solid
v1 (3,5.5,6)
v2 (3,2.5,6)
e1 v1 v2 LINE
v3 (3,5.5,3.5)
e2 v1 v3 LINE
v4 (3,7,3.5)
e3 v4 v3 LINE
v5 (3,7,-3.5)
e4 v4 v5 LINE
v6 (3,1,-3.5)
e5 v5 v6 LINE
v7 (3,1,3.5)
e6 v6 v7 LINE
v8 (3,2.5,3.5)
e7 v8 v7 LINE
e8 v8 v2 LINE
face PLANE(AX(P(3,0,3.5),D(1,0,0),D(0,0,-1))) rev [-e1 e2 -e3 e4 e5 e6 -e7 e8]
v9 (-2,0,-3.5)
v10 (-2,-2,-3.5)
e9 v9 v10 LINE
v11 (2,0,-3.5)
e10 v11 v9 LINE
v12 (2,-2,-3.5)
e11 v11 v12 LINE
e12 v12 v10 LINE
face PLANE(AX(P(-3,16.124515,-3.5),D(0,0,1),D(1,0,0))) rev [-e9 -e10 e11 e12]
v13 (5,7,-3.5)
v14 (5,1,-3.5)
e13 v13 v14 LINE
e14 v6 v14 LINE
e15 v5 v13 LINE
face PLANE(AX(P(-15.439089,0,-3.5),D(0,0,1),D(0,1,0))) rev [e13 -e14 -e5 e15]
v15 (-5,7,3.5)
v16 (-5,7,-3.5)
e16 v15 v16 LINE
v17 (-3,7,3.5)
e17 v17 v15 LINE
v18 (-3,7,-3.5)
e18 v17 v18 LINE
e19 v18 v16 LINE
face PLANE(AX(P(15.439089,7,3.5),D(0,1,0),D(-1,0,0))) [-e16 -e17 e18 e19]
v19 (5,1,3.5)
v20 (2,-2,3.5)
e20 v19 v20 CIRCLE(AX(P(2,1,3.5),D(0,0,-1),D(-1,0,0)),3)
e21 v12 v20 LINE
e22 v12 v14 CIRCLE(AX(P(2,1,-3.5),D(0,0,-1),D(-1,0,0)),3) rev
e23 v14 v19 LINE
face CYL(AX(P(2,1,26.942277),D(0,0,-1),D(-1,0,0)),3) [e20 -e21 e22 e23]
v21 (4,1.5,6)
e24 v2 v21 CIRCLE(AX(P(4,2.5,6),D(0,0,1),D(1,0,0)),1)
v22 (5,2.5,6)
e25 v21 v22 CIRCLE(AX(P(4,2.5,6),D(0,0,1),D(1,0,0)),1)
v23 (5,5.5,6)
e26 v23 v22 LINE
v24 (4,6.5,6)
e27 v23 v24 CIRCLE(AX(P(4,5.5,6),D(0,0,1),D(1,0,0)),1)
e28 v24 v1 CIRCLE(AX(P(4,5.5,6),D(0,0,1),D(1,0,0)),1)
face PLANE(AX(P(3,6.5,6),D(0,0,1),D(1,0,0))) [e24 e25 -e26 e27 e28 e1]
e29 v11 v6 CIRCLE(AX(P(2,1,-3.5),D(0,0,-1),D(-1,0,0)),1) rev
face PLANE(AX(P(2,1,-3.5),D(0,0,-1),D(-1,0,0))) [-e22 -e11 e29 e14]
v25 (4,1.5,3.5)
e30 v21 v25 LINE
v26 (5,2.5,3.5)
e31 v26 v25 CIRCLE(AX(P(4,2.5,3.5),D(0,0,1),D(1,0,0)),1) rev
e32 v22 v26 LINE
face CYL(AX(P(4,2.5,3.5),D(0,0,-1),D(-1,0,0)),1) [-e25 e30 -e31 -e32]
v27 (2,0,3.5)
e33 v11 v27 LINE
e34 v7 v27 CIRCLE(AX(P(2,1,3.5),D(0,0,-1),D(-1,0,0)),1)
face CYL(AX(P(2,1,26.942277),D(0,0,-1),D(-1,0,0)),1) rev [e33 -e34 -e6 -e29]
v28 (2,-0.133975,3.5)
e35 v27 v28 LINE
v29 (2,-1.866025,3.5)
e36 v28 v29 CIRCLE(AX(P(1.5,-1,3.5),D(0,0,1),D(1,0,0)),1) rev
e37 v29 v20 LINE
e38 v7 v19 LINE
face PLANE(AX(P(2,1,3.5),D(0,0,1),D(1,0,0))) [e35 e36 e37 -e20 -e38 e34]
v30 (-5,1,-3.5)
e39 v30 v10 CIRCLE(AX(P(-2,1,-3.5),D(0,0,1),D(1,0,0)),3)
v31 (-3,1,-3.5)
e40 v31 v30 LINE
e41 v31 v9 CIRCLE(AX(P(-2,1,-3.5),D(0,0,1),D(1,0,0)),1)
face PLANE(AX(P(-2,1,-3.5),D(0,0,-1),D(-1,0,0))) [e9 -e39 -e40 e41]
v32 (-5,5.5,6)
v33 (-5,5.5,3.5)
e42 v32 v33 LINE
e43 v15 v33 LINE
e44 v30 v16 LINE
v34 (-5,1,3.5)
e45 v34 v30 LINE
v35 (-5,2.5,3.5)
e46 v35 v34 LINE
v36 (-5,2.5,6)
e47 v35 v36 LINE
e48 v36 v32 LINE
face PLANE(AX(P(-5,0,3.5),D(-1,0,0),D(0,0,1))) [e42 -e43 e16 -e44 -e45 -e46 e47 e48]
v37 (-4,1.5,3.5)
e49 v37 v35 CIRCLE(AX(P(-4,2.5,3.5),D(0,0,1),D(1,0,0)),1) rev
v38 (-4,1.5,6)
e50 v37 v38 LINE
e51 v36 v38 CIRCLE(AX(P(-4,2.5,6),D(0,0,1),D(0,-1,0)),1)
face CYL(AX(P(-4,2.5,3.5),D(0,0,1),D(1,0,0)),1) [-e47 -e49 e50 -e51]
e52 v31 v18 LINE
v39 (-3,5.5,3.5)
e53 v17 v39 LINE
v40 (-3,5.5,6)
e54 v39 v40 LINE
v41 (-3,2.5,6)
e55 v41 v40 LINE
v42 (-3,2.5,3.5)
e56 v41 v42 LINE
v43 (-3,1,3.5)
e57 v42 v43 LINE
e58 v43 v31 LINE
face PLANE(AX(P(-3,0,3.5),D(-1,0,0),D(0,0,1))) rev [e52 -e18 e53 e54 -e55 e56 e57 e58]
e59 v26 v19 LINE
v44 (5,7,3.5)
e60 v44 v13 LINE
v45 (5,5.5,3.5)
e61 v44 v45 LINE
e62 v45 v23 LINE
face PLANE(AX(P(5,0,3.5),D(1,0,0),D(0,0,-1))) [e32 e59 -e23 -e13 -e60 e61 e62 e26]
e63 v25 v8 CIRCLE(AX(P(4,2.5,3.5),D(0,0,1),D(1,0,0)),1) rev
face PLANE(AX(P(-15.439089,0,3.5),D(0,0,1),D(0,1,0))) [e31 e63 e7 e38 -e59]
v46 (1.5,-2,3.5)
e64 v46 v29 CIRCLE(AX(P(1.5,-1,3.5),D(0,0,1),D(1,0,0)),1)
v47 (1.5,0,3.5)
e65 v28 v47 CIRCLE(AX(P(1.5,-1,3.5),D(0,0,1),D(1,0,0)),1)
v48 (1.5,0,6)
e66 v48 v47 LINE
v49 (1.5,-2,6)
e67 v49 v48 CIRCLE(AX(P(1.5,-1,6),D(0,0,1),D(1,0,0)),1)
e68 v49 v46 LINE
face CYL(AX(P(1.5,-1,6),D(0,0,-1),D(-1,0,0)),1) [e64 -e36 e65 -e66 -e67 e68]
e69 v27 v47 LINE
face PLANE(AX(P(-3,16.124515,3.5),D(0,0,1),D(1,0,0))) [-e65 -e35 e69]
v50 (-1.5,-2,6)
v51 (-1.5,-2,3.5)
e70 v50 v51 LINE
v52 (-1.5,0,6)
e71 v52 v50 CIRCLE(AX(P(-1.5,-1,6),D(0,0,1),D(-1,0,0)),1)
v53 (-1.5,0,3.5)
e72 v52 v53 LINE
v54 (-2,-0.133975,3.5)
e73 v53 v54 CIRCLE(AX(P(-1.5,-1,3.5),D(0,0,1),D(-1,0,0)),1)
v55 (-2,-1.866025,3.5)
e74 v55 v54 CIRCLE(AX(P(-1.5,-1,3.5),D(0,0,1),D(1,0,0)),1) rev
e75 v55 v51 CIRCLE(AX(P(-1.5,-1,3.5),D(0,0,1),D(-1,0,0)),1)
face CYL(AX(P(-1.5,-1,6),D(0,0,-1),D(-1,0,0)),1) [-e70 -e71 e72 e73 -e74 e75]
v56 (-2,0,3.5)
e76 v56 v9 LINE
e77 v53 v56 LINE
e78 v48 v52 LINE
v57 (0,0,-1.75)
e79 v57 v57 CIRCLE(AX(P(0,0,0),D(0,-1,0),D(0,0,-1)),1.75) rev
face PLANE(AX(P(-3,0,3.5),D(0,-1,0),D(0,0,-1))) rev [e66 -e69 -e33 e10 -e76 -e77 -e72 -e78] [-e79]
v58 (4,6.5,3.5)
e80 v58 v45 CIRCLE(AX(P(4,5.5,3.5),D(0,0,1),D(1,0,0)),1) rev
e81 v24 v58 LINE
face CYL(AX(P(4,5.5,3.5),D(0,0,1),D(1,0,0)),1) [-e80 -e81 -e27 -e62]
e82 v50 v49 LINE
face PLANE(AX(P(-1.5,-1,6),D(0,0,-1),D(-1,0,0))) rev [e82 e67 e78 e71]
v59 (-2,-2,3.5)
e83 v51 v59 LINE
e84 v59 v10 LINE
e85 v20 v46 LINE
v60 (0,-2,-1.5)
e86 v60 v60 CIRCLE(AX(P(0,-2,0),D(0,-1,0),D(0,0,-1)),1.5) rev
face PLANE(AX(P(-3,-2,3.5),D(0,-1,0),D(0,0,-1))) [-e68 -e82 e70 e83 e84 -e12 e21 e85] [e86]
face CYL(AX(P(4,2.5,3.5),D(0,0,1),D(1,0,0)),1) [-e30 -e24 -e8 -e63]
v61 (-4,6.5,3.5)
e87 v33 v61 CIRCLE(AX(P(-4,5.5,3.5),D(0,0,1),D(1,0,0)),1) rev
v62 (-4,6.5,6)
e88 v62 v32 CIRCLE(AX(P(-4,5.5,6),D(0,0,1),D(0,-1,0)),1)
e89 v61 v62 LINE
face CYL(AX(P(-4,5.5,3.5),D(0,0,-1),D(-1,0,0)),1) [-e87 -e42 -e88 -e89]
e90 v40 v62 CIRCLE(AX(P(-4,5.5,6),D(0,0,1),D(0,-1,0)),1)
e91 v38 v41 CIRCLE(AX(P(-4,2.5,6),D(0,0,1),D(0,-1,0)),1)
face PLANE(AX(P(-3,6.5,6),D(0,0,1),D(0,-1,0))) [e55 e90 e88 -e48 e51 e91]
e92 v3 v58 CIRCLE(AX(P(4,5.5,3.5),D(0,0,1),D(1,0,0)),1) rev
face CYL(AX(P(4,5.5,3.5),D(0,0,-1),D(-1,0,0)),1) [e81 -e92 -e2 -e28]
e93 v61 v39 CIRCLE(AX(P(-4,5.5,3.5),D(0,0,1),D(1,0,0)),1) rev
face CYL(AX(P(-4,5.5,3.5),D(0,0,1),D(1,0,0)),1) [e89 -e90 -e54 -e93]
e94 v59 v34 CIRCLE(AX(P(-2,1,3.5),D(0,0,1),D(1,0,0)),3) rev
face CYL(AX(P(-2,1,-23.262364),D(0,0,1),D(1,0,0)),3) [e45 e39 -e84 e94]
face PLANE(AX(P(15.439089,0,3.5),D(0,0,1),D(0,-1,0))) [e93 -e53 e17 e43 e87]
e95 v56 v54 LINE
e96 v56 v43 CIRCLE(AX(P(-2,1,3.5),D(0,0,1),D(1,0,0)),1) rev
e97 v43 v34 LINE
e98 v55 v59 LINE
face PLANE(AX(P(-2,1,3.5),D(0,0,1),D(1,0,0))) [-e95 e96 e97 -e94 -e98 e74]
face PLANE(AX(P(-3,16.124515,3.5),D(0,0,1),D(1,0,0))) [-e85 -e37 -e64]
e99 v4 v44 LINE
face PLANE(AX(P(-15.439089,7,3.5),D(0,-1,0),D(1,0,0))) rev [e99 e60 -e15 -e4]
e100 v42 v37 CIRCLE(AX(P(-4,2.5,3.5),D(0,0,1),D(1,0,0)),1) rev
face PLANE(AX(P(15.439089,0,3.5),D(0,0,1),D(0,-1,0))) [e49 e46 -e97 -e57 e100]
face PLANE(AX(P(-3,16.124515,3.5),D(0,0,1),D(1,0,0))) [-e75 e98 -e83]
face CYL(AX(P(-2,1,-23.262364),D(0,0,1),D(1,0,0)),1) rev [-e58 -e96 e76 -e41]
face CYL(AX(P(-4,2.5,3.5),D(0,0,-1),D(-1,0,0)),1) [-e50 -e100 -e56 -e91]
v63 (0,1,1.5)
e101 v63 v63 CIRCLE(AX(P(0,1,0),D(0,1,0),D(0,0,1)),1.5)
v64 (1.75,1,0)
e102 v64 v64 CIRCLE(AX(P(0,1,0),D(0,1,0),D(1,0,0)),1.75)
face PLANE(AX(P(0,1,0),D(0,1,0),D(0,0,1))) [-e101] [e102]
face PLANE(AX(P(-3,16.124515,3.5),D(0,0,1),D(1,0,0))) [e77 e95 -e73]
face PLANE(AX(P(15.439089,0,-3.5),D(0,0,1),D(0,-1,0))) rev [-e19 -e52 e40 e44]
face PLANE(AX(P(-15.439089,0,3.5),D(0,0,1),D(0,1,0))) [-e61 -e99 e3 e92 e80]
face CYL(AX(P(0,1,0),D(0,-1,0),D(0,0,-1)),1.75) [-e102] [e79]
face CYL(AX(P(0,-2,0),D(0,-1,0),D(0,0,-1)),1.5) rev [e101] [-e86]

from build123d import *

# Parameters (mm, degrees)
EXTRU_MINCE1_DEPTH      = 3.5
D_PLIAGE_START          = -3.5
D_PLIAGE_2_OUTLINE_W    = 2
D_PLIAGE_2_OUTLINE_H    = 7
D_PLIAGE_2_DEPTH        = 7
D_PLIAGE_2_2_OUTLINE_W  = 6.141592654
D_PLIAGE_2_2_OUTLINE_H  = 2
D_PLIAGE_2_2_DEPTH      = 7
PLIAGE_START            = -3.5
PLIAGE_2_DEPTH          = 7
PLIAGE_2_2_DEPTH        = 7
ENL_V_MAT_EXTRU_1_REACH = 11.287
ESQUISSE10_R            = 1.5
ESQUISSE11_W            = 2.5
ESQUISSE11_H            = 5
PATTE1_DEPTH            = 2
CONG_2_R                = 1
ESQUISSE13_W            = 2.5
ESQUISSE13_H            = 5
PATTE2_DEPTH            = 2
CONG_9_R                = 1
EXTRUSION2_DEPTH        = 2.5
EXTRU_MINCE2_START      = 1
ESQUISSE16_R            = 1.75
ESQUISSE16_R_2          = 1.5
EXTRU_MINCE2_DEPTH      = 1


# Read off the part's stored shape, not the designer's step: Dépliage 2, Pliage 2
# Sheet-metal steps are written as plain solids
with BuildPart() as part:
    # Esquisse1 → Extru.-Mince1 (new, symmetric)
    with BuildSketch(Plane.XY):
        Polygon((-3, 7), (-3, 0), (3, 0), (3, 7), (5, 7), (5, -2), (-5, -2), (-5, 7), align=None)
    extrude(amount=EXTRU_MINCE1_DEPTH, both=True)

    # Dépliage 2 outline → Dépliage 2 (cut)
    with BuildSketch(Plane.XY.offset(D_PLIAGE_START)):
        with Locations((4, 3.5)):
            Rectangle(D_PLIAGE_2_OUTLINE_W, D_PLIAGE_2_OUTLINE_H)
        with Locations((-4, 3.5)):
            Rectangle(D_PLIAGE_2_OUTLINE_W, D_PLIAGE_2_OUTLINE_H)
    extrude(amount=D_PLIAGE_2_DEPTH, mode=Mode.SUBTRACT)

    # D_pliage 2 2 outline → D_pliage 2 2 (add)
    with BuildSketch(Plane.XY.offset(D_PLIAGE_START)):
        with Locations((8.070796327, -1)):
            Rectangle(D_PLIAGE_2_2_OUTLINE_W, D_PLIAGE_2_2_OUTLINE_H)
        with Locations((-8.070796327, -1)):
            Rectangle(D_PLIAGE_2_2_OUTLINE_W, D_PLIAGE_2_2_OUTLINE_H)
    extrude(amount=D_PLIAGE_2_2_DEPTH)

    # Pliage 2 outline → Pliage 2 (cut)
    with BuildSketch(Plane.XY.offset(PLIAGE_START)):
        with BuildLine():
            ThreePointArc((-2, -2), (-3.732050808, -1.449489743), (-4.828427125, 0))
            Line((-4.828427125, 0), (-11.141592654, 0))
            Line((-11.141592654, 0), (-11.141592654, -2))
            Line((-11.141592654, -2), (-2, -2))
        make_face()
        with BuildLine():
            Line((11.141592654, 0), (4.828427125, 0))
            ThreePointArc((4.828427125, 0), (3.732050808, -1.449489743), (2, -2))
            Line((2, -2), (11.141592654, -2))
            Line((11.141592654, -2), (11.141592654, 0))
        make_face()
    extrude(amount=PLIAGE_2_DEPTH, mode=Mode.SUBTRACT)

    # Pliage 2 2 outline → Pliage 2 2 (add)
    with BuildSketch(Plane.XY.offset(PLIAGE_START)):
        with BuildLine():
            Line((-3, 1), (-3, 7))
            Line((-3, 7), (-5, 7))
            Line((-5, 7), (-5, 1))
            ThreePointArc((-5, 1), (-4.956795679, 0.492694064), (-4.828427125, 0))
            Line((-4.828427125, 0), (-2, 0))
            ThreePointArc((-2, 0), (-2.707106781, 0.292893219), (-3, 1))
        make_face()
        with BuildLine():
            Line((5, 7), (3, 7))
            Line((3, 7), (3, 1))
            ThreePointArc((3, 1), (2.707106781, 0.292893219), (2, 0))
            Line((2, 0), (4.828427125, 0))
            ThreePointArc((4.828427125, 0), (4.956795679, 0.492694064), (5, 1))
            Line((5, 1), (5, 7))
        make_face()
    extrude(amount=PLIAGE_2_2_DEPTH)

    # Esquisse10 → Enlèv. mat.-Extru.1 (cut, up to next)
    with BuildSketch(Plane(origin=(0, 0, 0), x_dir=(1, 0, 0), z_dir=(0, 1, 0)), mode=Mode.PRIVATE) as enl_v_mat_extru_1_sk1:
        with Locations(Location((0, 0, 0), (0, 0, 90))):
            Circle(ESQUISSE10_R)
    enl_v_mat_extru_1_tool1 = extrude(enl_v_mat_extru_1_sk1.sketch, amount=-ENL_V_MAT_EXTRU_1_REACH, mode=Mode.PRIVATE) & part.part
    add(enl_v_mat_extru_1_tool1.solids().sort_by_distance((0, 0, 0))[0], mode=Mode.SUBTRACT)

    # Esquisse11 → Patte1 (add)
    with BuildSketch(Plane.ZY.offset(5)):
        with Locations((4.75, 4)):
            Rectangle(ESQUISSE11_W, ESQUISSE11_H)
    extrude(amount=-PATTE1_DEPTH)

    # Congé2
    cong_2_edges = [part.edges().sort_by_distance(p)[0] for p in [
        (-5, 6.5, 4.75),
        (-3, 6.5, 4.75),
        (-5, 1.5, 4.75),
        (-3, 1.5, 4.75),
    ]]
    fillet(cong_2_edges, radius=CONG_2_R - 0.0001)  # a hair under: the kernel refuses the full size

    # Esquisse13 → Patte2 (add)
    with BuildSketch(Plane(origin=(5, 0, 0), x_dir=(0, 0, -1), z_dir=(1, 0, 0))):
        with Locations((-4.75, 4)):
            Rectangle(ESQUISSE13_W, ESQUISSE13_H)
    extrude(amount=-PATTE2_DEPTH)

    # Congé9
    cong_9_edges = [part.edges().sort_by_distance(p)[0] for p in [
        (5, 6.5, 4.75),
        (3, 6.5, 4.75),
        (5, 1.5, 4.75),
        (3, 1.5, 4.75),
    ]]
    fillet(cong_9_edges, radius=CONG_9_R - 0.0001)  # a hair under: the kernel refuses the full size

    # Esquisse15 → Extrusion2 (add)
    with BuildSketch(Plane.XY.offset(3.5)):
        with BuildLine():
            Line((1.5, 0), (-1.5, 0))
            ThreePointArc((-1.5, 0), (-2.5, -1), (-1.5, -2))
            Line((-1.5, -2), (1.5, -2))
            ThreePointArc((1.5, -2), (2.5, -1), (1.5, 0))
        make_face()
    extrude(amount=EXTRUSION2_DEPTH)

    # Esquisse16 → Extru.-Mince2 (add)
    with BuildSketch(Plane(origin=(0, 0, 0), x_dir=(1, 0, 0), z_dir=(0, 1, 0)).offset(EXTRU_MINCE2_START)):
        Circle(ESQUISSE16_R)
        Circle(ESQUISSE16_R_2, mode=Mode.SUBTRACT)
    extrude(amount=-EXTRU_MINCE2_DEPTH)


solid = part.part
